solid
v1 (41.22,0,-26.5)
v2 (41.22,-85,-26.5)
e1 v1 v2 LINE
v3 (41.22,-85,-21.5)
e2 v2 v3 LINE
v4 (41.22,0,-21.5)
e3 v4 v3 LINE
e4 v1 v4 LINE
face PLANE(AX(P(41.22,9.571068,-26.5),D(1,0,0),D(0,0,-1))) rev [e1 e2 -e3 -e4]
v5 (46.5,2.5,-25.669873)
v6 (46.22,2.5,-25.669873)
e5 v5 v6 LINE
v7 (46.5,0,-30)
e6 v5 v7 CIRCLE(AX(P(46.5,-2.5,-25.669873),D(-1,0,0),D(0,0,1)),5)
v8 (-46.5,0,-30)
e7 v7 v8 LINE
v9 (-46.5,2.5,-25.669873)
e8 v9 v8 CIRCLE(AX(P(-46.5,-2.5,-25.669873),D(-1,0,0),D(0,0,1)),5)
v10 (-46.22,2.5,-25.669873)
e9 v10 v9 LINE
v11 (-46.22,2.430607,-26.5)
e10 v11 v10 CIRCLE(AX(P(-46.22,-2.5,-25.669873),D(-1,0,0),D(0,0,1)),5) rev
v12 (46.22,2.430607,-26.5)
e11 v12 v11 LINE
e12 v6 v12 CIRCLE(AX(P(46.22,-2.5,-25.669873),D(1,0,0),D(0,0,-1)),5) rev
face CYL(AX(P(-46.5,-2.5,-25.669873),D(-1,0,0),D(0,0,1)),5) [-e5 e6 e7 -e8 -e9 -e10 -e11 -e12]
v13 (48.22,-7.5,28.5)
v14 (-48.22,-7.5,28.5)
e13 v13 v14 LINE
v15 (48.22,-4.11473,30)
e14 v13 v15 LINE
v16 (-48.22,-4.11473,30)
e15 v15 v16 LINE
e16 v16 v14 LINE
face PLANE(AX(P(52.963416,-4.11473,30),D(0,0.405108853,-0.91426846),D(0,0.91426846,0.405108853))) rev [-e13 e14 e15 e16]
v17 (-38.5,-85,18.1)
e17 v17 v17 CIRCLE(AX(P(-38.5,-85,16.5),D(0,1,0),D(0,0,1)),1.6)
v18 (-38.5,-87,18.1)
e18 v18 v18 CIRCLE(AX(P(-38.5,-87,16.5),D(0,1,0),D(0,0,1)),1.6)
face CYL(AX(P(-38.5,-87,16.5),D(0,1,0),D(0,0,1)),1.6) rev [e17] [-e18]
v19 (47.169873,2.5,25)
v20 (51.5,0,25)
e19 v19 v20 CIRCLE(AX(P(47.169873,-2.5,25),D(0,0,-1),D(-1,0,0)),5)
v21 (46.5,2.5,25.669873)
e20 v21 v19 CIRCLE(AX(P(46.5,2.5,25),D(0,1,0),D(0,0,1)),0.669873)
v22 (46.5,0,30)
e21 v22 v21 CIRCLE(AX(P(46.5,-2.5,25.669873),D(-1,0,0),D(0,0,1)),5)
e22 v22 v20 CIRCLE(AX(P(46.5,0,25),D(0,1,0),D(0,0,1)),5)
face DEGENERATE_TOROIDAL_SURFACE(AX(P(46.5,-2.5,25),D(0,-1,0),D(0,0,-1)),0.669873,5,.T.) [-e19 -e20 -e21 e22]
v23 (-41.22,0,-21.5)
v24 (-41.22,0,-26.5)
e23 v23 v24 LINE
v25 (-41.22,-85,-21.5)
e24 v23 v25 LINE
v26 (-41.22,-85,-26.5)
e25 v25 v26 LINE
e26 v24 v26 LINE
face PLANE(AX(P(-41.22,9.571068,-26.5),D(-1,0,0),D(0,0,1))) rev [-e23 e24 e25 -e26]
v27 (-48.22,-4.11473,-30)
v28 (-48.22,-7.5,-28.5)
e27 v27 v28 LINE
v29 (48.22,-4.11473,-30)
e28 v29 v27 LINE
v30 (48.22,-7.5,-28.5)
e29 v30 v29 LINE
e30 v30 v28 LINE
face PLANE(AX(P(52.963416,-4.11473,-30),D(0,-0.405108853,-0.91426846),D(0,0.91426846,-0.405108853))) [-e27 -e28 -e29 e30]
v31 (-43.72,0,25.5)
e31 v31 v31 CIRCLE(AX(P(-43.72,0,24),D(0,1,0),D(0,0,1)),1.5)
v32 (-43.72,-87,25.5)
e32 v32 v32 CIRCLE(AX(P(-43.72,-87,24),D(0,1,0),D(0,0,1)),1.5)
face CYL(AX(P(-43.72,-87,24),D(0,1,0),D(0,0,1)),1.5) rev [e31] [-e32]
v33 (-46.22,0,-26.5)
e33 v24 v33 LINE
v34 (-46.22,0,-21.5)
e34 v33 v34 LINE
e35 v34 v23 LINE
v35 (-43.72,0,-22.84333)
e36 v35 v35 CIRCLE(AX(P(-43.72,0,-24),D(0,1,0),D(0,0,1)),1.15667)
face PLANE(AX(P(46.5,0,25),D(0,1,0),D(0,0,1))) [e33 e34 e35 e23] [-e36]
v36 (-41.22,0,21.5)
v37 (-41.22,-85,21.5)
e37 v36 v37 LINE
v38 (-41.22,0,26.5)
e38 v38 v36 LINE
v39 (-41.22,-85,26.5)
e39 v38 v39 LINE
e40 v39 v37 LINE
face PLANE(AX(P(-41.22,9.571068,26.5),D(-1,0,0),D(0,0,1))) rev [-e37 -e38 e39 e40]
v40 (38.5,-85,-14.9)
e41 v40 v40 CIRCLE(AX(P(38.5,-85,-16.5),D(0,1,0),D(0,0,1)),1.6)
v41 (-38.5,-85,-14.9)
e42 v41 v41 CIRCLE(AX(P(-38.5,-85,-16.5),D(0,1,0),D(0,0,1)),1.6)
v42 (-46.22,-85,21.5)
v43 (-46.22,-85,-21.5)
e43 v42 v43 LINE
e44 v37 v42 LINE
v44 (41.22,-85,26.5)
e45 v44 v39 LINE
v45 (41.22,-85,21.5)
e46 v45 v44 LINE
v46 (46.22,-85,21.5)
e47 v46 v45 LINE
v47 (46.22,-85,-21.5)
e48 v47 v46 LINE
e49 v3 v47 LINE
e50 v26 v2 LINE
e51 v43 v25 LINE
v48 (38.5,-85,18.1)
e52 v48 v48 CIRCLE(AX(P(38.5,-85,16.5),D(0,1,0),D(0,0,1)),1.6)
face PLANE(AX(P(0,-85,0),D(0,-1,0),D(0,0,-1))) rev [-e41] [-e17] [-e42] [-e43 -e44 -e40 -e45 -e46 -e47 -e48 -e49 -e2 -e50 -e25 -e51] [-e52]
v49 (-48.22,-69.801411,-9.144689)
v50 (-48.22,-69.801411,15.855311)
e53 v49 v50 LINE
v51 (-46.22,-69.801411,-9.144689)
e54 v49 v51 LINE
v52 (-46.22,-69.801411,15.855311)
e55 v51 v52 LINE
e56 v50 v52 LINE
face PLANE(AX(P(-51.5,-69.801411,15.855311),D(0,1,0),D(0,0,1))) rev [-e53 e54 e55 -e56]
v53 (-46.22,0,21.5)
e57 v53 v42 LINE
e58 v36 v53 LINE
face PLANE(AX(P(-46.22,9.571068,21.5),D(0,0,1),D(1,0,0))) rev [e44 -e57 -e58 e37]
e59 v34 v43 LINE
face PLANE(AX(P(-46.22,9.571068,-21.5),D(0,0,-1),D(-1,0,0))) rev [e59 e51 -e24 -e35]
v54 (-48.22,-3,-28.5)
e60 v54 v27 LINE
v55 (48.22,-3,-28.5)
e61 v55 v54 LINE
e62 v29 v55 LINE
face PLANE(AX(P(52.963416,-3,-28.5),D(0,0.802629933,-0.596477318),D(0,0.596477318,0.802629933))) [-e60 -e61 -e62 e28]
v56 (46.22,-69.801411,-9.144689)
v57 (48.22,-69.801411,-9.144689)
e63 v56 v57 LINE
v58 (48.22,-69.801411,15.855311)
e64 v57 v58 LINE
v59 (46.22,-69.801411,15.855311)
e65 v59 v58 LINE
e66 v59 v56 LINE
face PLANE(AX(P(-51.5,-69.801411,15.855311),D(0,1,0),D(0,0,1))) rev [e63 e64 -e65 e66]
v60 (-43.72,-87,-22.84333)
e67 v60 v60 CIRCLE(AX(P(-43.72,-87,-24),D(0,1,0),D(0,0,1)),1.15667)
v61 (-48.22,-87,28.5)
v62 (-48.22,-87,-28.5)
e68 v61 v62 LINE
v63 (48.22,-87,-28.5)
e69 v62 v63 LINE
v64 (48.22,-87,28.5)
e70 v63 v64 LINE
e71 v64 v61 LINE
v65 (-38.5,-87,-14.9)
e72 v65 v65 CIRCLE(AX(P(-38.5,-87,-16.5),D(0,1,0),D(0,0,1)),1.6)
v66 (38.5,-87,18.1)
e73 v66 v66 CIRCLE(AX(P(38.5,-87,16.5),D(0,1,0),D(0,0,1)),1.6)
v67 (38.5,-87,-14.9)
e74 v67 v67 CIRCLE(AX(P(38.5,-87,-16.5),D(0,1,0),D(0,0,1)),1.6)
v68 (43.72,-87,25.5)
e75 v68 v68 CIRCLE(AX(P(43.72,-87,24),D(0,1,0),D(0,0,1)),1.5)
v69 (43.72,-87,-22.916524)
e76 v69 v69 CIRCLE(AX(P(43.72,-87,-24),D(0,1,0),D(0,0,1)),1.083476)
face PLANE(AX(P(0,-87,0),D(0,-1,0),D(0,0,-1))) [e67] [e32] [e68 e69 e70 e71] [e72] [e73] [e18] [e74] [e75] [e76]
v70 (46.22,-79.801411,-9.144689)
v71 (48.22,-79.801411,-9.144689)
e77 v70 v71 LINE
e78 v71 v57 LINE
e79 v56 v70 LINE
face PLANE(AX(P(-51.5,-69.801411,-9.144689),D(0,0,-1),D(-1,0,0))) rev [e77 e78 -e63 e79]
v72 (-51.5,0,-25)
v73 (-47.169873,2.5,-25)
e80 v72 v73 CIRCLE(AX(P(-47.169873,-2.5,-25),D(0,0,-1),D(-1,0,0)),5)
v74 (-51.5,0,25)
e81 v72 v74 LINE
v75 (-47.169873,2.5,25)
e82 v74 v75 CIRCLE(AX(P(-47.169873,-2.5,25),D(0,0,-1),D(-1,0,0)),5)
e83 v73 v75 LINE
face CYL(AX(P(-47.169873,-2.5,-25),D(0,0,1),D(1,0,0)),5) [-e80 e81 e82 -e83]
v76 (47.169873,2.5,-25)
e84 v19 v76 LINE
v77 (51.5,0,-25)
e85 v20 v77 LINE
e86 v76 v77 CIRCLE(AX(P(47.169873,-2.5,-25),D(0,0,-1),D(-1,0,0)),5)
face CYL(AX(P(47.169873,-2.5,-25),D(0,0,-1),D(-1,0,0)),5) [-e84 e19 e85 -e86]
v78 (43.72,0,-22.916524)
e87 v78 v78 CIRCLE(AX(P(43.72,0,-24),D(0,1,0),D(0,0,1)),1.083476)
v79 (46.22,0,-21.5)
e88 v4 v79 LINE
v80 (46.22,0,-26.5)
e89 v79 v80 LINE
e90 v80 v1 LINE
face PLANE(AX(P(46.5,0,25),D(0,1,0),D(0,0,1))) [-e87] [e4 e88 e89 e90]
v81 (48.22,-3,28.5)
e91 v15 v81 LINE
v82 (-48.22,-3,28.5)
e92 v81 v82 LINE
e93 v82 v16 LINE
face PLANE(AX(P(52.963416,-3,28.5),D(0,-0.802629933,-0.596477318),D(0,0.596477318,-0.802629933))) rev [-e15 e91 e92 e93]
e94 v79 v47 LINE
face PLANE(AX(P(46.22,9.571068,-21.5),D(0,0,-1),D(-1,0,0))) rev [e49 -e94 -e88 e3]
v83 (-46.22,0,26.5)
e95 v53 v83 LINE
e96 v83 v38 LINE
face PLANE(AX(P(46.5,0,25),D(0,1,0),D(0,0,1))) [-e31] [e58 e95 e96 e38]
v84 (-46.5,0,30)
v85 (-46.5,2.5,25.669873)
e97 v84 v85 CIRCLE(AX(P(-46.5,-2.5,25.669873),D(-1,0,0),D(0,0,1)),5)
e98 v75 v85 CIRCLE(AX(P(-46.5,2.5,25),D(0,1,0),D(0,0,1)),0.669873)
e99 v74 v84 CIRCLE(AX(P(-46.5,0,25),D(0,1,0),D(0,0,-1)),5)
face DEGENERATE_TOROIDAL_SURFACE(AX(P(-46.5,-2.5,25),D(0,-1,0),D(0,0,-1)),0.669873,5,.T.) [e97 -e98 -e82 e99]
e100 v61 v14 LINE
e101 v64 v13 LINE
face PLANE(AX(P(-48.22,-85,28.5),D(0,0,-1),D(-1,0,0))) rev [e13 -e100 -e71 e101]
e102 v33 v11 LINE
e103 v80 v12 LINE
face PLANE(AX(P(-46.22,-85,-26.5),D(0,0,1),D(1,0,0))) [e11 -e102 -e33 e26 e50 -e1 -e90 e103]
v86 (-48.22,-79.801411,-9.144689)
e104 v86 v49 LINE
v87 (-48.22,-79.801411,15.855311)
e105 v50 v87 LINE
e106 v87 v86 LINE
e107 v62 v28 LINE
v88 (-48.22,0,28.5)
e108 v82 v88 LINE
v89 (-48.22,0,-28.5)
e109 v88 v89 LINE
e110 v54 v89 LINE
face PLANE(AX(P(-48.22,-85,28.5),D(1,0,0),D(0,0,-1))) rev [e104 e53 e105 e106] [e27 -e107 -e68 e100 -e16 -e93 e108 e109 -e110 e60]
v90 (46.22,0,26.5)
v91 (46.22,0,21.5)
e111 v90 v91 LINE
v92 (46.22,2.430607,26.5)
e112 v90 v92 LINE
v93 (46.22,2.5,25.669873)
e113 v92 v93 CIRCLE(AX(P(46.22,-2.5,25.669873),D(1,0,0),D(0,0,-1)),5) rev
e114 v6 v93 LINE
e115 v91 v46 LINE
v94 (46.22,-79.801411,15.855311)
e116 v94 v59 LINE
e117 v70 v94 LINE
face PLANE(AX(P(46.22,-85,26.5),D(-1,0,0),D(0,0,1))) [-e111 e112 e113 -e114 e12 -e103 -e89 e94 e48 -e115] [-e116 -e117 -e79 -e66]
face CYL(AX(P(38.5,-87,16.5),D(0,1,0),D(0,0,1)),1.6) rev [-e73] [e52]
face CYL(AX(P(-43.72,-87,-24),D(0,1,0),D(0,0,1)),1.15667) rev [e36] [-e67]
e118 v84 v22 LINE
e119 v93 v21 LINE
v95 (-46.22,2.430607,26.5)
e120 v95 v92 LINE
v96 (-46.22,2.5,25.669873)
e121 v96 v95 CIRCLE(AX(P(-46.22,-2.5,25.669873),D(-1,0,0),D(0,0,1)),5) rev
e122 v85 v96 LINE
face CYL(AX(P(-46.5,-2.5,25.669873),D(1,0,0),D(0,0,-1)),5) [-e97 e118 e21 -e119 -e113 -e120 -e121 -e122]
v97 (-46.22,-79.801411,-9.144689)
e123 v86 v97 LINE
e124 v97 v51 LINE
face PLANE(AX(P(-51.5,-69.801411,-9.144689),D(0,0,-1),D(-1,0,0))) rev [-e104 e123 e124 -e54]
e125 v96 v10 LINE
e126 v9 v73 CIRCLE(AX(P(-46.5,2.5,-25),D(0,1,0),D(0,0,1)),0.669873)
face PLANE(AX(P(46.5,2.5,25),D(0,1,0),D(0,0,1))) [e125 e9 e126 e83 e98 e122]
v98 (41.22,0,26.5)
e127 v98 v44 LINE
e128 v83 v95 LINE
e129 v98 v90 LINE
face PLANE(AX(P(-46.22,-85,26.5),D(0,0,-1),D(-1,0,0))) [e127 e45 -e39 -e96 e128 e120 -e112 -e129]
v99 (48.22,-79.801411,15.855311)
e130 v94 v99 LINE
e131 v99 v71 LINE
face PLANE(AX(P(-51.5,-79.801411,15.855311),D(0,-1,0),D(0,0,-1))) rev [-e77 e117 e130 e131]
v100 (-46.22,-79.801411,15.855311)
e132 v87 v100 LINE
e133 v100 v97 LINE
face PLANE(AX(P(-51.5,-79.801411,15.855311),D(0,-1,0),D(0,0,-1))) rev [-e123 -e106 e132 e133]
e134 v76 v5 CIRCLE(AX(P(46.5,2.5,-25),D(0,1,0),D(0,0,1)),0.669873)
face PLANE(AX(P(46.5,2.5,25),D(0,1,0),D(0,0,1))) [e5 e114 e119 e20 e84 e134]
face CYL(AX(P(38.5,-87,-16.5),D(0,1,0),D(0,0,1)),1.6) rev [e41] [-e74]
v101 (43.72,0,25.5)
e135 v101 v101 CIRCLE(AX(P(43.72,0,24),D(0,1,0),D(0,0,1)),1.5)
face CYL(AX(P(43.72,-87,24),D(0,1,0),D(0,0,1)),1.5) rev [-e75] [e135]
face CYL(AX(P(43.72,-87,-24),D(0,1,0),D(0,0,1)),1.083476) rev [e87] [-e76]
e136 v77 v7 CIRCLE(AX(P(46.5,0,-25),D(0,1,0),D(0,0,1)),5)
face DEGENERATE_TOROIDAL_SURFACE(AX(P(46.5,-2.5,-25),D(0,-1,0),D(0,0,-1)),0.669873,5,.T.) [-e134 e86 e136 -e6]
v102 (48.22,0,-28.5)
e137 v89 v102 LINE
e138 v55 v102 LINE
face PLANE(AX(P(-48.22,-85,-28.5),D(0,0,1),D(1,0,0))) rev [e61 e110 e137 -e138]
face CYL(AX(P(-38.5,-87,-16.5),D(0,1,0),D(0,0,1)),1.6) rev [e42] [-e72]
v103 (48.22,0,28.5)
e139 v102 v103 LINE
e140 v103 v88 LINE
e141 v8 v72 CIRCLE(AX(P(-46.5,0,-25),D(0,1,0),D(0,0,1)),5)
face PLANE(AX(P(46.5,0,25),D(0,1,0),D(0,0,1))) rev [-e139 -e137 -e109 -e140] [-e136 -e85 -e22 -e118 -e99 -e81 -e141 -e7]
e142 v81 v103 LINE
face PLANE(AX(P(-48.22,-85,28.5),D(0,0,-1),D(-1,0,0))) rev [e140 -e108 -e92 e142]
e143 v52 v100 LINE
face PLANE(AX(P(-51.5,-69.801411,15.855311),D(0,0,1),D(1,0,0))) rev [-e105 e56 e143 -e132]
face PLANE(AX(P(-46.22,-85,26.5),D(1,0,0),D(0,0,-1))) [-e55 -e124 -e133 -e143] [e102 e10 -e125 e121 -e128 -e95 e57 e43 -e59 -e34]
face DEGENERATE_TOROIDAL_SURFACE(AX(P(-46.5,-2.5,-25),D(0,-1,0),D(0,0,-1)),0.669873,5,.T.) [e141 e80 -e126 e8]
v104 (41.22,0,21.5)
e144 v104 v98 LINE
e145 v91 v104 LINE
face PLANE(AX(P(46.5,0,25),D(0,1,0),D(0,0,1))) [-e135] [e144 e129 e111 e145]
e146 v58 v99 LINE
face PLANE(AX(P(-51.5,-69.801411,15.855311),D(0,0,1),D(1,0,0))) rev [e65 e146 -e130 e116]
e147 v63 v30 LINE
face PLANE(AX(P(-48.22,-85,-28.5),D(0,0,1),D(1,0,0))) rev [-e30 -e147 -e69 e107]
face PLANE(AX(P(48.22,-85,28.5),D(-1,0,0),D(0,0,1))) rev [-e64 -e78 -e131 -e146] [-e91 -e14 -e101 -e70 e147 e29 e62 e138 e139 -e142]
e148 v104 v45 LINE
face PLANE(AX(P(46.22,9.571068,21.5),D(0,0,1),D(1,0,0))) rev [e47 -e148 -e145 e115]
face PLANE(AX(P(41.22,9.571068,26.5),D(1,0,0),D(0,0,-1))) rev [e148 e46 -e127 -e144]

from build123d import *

# Parameters (mm, degrees)
BOSS_EXTRUDE1_DEPTH = 2.5
FILLET1_R           = 5
SKETCH2_W           = 96.44
SKETCH2_H           = 57
SKETCH2_W_2         = 92.44
SKETCH2_H_2         = 53
BOSS_EXTRUDE2_DEPTH = 85
SKETCH4_W           = 92.44
SKETCH4_H           = 53
CUT_EXTRUDE1_DEPTH  = 104.813534763
SKETCH3_W           = 96.44
SKETCH3_H           = 57
BOSS_EXTRUDE3_DEPTH = 2
BOSS_EXTRUDE4_DEPTH = 96.44
SKETCH6_W           = 5
SKETCH6_H           = 5
BOSS_EXTRUDE5_DEPTH = 85
SKETCH7_R           = 1.6
CUT_EXTRUDE2_DEPTH  = 106.870203551
SKETCH8_W           = 25
SKETCH8_H           = 10
CUT_EXTRUDE3_DEPTH  = 136.694798721
SKETCH9_R           = 1.5
SKETCH9_R_2         = 1.08347565
SKETCH9_R_3         = 1.156670199
CUT_EXTRUDE4_DEPTH  = 106.457337345


with BuildPart() as part:
    # Sketch1 → Boss-Extrude1 (new body)
    with BuildSketch(Plane(origin=(0, 0, 0), x_dir=(1, 0, 0), z_dir=(0, 1, 0))):
        with BuildLine():
            Line((-46.5, 30), (46.5, 30))
            ThreePointArc((46.5, 30), (50.035533906, 28.535533906), (51.5, 25))
            Line((51.5, 25), (51.5, -25))
            ThreePointArc((51.5, -25), (50.035533906, -28.535533906), (46.5, -30))
            Line((46.5, -30), (-46.5, -30))
            ThreePointArc((-46.5, -30), (-50.035533906, -28.535533906), (-51.5, -25))
            Line((-51.5, -25), (-51.5, 25))
            ThreePointArc((-51.5, 25), (-50.035533906, 28.535533906), (-46.5, 30))
        make_face()
    extrude(amount=BOSS_EXTRUDE1_DEPTH)

    # Fillet1
    # the kernel refuses this fillet: 5 mm, written as the material it takes off along each edge
    with BuildSketch(Plane(origin=(-46.5, 2.5, -25), x_dir=(-1, 0, 0), z_dir=(0, 0, 1))) as fillet1_piece_1:
        with BuildLine():
            CenterArc((0.669872981, 5), FILLET1_R, 270, 60)
            Line((0.669872981, 0), (0.669872981, -0.1))
            Line((0.669872981, -0.1), (5, -0.1))
            Line((5, -0.1), (5.1, 0))
            ThreePointArc((5.1, 0), (5.1, 1.25), (5.08660254, 2.45))
            Line((5.08660254, 2.45), (5, 2.5))
        make_face()
    revolve(axis=Axis((-46.5, 2.5, -25), (0, -1, 0)), revolution_arc=90, mode=Mode.SUBTRACT)
    with BuildSketch(Plane(origin=(-46.5, 2.5, -30), x_dir=(0, -1, 0), z_dir=(1, 0, 0)), Plane(origin=(46.5, 2.5, 30), x_dir=(0, -1, 0), z_dir=(-1, 0, 0))) as fillet1_piece_2:
        with BuildLine():
            CenterArc((5, -4.330127019), FILLET1_R, 120, 60)
            Line((0, -4.330127019), (-0.1, -4.330127019))
            Line((-0.1, -4.330127019), (-0.1, 0))
            Line((-0.1, 0), (0, 0.1))
            ThreePointArc((0, 0.1), (1.25, 0.1), (2.45, 0.08660254))
            Line((2.45, 0.08660254), (2.5, 0))
        make_face()
    extrude(amount=93, mode=Mode.SUBTRACT)
    with BuildSketch(Plane(origin=(46.5, 2.5, -25), x_dir=(0, 0, -1), z_dir=(-1, 0, 0))) as fillet1_piece_3:
        with BuildLine():
            CenterArc((0.669872981, 5), FILLET1_R, 270, 60)
            Line((0.669872981, 0), (0.669872981, -0.1))
            Line((0.669872981, -0.1), (5, -0.1))
            Line((5, -0.1), (5.1, 0))
            ThreePointArc((5.1, 0), (5.1, 1.25), (5.08660254, 2.45))
            Line((5.08660254, 2.45), (5, 2.5))
        make_face()
    revolve(axis=Axis((46.5, 2.5, -25), (0, -1, 0)), revolution_arc=90, mode=Mode.SUBTRACT)
    with BuildSketch(Plane(origin=(51.5, 2.5, -25), x_dir=(0, -1, 0), z_dir=(0, 0, 1)), Plane(origin=(-51.5, 2.5, 25), x_dir=(0, -1, 0), z_dir=(0, 0, -1))) as fillet1_piece_4:
        with BuildLine():
            CenterArc((5, -4.330127019), FILLET1_R, 120, 60)
            Line((0, -4.330127019), (-0.1, -4.330127019))
            Line((-0.1, -4.330127019), (-0.1, 0))
            Line((-0.1, 0), (0, 0.1))
            ThreePointArc((0, 0.1), (1.25, 0.1), (2.45, 0.08660254))
            Line((2.45, 0.08660254), (2.5, 0))
        make_face()
    extrude(amount=50, mode=Mode.SUBTRACT)
    with BuildSketch(Plane(origin=(46.5, 2.5, 25), x_dir=(1, 0, 0), z_dir=(0, 0, -1))) as fillet1_piece_5:
        with BuildLine():
            CenterArc((0.669872981, 5), FILLET1_R, 270, 60)
            Line((0.669872981, 0), (0.669872981, -0.1))
            Line((0.669872981, -0.1), (5, -0.1))
            Line((5, -0.1), (5.1, 0))
            ThreePointArc((5.1, 0), (5.1, 1.25), (5.08660254, 2.45))
            Line((5.08660254, 2.45), (5, 2.5))
        make_face()
    revolve(axis=Axis((46.5, 2.5, 25), (0, -1, 0)), revolution_arc=90, mode=Mode.SUBTRACT)
    with BuildSketch(Plane(origin=(-46.5, 2.5, 25), x_dir=(0, 0, 1), z_dir=(1, 0, 0))) as fillet1_piece_6:
        with BuildLine():
            CenterArc((0.669872981, 5), FILLET1_R, 270, 60)
            Line((0.669872981, 0), (0.669872981, -0.1))
            Line((0.669872981, -0.1), (5, -0.1))
            Line((5, -0.1), (5.1, 0))
            ThreePointArc((5.1, 0), (5.1, 1.25), (5.08660254, 2.45))
            Line((5.08660254, 2.45), (5, 2.5))
        make_face()
    revolve(axis=Axis((-46.5, 2.5, 25), (0, -1, 0)), revolution_arc=90, mode=Mode.SUBTRACT)

    # Sketch2 → Boss-Extrude2 (add)
    with BuildSketch(Plane.XZ):
        Rectangle(SKETCH2_W, SKETCH2_H)
        Rectangle(SKETCH2_W_2, SKETCH2_H_2, mode=Mode.SUBTRACT)
    extrude(amount=BOSS_EXTRUDE2_DEPTH)

    # Sketch4 → Cut-Extrude1 (cut, through all)
    with BuildSketch(Plane.XZ):
        Rectangle(SKETCH4_W, SKETCH4_H)
    extrude(amount=-CUT_EXTRUDE1_DEPTH, mode=Mode.SUBTRACT)

    # Sketch3 → Boss-Extrude3 (add)
    with BuildSketch(Plane.XZ.offset(85)):
        Rectangle(SKETCH3_W, SKETCH3_H)
    extrude(amount=BOSS_EXTRUDE3_DEPTH)

    # Sketch5 → Boss-Extrude4 (add)
    with BuildSketch(Plane.ZY.offset(48.22)):
        Polygon((-28.5, -7.5), (-28.5, -3), (-30, -4.114730389), align=None)
    boss_extrude4 = extrude(amount=-BOSS_EXTRUDE4_DEPTH)

    # Mirror1: Boss-Extrude4 across plane
    add(boss_extrude4.mirror(Plane.XY))

    # Sketch6 → Boss-Extrude5 (add)
    with BuildSketch(Plane(origin=(0, -85, 0), x_dir=(1, 0, 0), z_dir=(0, 1, 0))):
        with Locations((43.72, 24)):
            Rectangle(SKETCH6_W, SKETCH6_H)
        with Locations((-43.72, 24)):
            Rectangle(SKETCH6_W, SKETCH6_H)
        with Locations((43.72, -24)):
            Rectangle(SKETCH6_W, SKETCH6_H)
        with Locations((-43.72, -24)):
            Rectangle(SKETCH6_W, SKETCH6_H)
    extrude(amount=BOSS_EXTRUDE5_DEPTH)

    # Sketch7 → Cut-Extrude2 (cut, through all)
    with BuildSketch(Plane(origin=(0, -85, 0), x_dir=(1, 0, 0), z_dir=(0, 1, 0))):
        with Locations(Location((-38.5, 16.5, 0), (0, 0, 270))):
            Circle(SKETCH7_R)
        with Locations(Location((38.5, 16.5, 0), (0, 0, 270))):
            Circle(SKETCH7_R)
        with Locations(Location((-38.5, -16.5, 0), (0, 0, 270))):
            Circle(SKETCH7_R)
        with Locations(Location((38.5, -16.5, 0), (0, 0, 270))):
            Circle(SKETCH7_R)
    extrude(amount=-CUT_EXTRUDE2_DEPTH, mode=Mode.SUBTRACT)

    # Sketch8 → Cut-Extrude3 (cut, through all)
    with BuildSketch(Plane(origin=(48.22, 0, 0), x_dir=(0, 0, -1), z_dir=(1, 0, 0))):
        with Locations((-3.355310765, -74.801411427)):
            Rectangle(SKETCH8_W, SKETCH8_H)
    extrude(amount=-CUT_EXTRUDE3_DEPTH, mode=Mode.SUBTRACT)

    # Sketch9 → Cut-Extrude4 (cut, through all)
    with BuildSketch(Plane(origin=(0, 0, 0), x_dir=(1, 0, 0), z_dir=(0, 1, 0))):
        with Locations(Location((-43.72, -24, 0), (0, 0, 270))):
            Circle(SKETCH9_R)
        with Locations(Location((43.72, -24, 0), (0, 0, 270))):
            Circle(SKETCH9_R)
        with Locations(Location((43.72, 24, 0), (0, 0, 270))):
            Circle(SKETCH9_R_2)
        with Locations(Location((-43.72, 24, 0), (0, 0, 270))):
            Circle(SKETCH9_R_3)
    extrude(amount=-CUT_EXTRUDE4_DEPTH, mode=Mode.SUBTRACT)


solid = part.part
